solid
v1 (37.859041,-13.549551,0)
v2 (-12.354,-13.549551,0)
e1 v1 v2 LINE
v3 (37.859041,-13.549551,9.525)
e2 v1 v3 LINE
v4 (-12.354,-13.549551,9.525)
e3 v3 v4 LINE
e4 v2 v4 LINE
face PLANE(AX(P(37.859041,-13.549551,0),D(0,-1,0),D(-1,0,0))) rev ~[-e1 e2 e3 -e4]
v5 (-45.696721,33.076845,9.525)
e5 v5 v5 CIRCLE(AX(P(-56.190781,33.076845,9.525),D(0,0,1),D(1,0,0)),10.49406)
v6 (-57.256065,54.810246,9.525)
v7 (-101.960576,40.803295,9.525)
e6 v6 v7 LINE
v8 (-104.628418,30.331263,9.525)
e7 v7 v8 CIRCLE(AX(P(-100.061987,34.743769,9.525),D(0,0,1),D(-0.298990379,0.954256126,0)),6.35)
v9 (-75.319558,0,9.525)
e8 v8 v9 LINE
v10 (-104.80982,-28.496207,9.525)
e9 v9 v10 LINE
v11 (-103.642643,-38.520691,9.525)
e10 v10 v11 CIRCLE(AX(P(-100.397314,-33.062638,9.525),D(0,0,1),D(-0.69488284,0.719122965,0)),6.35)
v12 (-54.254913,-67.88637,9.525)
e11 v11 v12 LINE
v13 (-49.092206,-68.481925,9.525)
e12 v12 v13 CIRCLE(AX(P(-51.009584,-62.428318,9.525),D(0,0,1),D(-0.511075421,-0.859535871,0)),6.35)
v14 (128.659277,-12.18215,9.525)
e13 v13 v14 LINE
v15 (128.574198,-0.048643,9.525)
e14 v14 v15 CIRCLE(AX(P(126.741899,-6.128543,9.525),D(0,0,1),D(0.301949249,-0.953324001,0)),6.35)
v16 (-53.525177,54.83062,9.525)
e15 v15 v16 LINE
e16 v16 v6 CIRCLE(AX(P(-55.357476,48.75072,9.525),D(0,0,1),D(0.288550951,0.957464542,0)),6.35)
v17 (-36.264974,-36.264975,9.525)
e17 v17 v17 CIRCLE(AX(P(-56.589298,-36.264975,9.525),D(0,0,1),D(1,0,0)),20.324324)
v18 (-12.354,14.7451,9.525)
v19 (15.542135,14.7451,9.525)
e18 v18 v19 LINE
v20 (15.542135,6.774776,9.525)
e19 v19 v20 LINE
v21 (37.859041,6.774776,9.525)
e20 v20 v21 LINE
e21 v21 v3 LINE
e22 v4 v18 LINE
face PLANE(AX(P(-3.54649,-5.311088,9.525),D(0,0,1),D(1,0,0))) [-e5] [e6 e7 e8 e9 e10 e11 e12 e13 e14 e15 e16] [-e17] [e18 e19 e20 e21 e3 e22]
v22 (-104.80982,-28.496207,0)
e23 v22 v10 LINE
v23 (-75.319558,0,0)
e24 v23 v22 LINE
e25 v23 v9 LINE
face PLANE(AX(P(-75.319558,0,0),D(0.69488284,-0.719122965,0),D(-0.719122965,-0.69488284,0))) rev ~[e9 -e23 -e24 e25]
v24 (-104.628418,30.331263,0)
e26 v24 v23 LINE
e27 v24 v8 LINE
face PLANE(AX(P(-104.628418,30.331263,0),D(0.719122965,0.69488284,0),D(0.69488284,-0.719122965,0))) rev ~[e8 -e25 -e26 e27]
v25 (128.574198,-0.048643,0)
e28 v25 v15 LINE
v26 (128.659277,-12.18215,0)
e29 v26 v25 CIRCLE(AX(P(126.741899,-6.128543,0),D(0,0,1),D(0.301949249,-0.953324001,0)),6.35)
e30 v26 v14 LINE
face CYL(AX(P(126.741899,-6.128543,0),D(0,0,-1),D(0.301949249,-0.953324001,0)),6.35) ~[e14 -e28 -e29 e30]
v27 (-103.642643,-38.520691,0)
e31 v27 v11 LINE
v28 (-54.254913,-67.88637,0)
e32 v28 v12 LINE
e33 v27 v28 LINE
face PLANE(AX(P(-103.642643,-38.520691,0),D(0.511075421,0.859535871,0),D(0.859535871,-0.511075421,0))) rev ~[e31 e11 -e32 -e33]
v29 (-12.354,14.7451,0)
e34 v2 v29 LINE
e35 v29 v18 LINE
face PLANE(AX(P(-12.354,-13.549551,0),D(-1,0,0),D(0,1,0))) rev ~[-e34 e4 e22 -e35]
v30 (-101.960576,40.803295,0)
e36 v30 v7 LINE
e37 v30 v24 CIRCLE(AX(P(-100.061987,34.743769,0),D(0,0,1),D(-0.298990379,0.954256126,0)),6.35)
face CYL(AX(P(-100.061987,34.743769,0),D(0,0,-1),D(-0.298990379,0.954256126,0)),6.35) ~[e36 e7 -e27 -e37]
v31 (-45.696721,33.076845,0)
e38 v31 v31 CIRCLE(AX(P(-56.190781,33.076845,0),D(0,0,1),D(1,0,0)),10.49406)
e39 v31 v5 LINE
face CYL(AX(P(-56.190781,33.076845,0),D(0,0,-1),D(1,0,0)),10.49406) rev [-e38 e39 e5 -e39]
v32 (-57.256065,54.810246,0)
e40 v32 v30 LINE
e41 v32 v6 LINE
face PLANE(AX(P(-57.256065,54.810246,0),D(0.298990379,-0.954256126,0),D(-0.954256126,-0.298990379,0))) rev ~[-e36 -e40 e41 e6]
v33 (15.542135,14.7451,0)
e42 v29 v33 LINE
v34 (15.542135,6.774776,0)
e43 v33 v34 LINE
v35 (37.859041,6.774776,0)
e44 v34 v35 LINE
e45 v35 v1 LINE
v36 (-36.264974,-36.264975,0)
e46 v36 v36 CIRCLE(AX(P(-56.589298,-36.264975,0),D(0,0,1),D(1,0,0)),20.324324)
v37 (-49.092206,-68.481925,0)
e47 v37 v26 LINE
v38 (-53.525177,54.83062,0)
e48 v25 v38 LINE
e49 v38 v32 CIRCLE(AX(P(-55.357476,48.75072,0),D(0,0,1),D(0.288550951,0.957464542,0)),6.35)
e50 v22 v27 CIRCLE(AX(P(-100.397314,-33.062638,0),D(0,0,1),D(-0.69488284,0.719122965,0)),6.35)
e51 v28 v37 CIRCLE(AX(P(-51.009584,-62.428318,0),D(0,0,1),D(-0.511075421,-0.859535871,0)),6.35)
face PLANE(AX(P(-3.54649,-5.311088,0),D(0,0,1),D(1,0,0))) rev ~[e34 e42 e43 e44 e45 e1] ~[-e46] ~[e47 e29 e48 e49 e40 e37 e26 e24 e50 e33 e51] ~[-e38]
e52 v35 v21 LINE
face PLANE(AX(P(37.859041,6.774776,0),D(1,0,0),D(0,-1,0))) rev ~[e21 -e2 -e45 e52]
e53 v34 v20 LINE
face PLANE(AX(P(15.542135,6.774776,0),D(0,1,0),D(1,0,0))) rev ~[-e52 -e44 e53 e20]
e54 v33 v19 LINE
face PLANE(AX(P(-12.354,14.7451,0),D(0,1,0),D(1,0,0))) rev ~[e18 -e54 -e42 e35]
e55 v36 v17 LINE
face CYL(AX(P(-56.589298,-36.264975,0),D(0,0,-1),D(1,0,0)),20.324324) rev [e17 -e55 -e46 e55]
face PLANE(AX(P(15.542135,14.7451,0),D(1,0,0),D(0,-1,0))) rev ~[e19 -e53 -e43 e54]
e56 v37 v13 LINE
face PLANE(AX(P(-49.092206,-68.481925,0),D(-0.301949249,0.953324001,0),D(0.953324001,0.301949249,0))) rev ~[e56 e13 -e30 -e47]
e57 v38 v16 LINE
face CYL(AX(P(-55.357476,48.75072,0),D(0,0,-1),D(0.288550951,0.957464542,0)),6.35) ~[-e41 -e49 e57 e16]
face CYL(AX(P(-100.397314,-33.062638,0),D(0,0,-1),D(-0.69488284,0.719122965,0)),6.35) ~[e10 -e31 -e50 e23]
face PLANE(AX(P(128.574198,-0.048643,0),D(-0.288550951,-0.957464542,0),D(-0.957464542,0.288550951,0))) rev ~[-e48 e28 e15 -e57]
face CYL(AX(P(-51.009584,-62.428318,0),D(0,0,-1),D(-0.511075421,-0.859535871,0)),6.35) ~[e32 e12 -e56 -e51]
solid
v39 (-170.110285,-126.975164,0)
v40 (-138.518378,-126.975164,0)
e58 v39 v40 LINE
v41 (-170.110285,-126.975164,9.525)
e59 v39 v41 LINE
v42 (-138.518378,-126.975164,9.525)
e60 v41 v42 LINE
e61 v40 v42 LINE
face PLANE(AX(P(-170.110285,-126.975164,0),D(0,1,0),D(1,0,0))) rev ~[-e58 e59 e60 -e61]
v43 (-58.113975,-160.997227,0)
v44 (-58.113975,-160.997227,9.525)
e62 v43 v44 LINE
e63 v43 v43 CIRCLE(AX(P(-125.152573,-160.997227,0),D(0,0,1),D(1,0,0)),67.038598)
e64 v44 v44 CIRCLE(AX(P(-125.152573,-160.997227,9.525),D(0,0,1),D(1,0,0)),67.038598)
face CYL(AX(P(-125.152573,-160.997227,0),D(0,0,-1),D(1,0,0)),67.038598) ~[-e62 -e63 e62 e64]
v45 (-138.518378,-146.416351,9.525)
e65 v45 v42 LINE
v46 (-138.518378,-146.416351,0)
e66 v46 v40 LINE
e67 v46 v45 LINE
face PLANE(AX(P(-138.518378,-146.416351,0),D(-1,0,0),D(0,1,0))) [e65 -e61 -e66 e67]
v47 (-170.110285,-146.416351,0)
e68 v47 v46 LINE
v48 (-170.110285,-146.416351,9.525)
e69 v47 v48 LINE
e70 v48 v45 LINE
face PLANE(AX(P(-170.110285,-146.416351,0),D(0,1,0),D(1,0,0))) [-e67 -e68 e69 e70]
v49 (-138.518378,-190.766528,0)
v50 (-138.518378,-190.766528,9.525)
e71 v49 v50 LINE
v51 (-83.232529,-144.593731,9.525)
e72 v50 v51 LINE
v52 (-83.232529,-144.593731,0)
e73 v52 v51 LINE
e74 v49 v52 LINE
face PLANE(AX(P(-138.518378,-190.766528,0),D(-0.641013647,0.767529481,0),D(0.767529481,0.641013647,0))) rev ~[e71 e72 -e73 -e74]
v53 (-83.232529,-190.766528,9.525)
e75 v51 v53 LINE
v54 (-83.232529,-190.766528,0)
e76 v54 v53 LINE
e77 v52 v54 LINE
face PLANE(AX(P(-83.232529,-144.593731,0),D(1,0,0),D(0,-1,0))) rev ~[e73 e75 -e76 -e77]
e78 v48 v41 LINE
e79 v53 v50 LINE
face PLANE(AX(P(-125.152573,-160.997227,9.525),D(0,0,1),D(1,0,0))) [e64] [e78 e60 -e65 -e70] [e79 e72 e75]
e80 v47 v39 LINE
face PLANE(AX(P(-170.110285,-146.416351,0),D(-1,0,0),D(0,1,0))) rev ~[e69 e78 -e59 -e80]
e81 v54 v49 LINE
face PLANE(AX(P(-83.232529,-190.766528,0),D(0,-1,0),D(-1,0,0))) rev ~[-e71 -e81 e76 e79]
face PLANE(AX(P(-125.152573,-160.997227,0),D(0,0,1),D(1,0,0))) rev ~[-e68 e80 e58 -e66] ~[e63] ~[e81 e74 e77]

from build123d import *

# Parameters (mm, degrees)
F0_R     = 20.324324422
F0_R_2   = 10.4940599903
F1_DEPTH = 9.525
F2_R     = 67.0385979525
F2_W     = 31.5919071436
F2_H     = 19.4411873817
F3_DEPTH = 9.525


# Not quite as in the source:
# - a length typed as a fraction of an inch, garbled in the dataset ("3 / 203.2 mm" for 3/8 in), is restored


with BuildPart() as f1:
    # F0 (on Top) → F1 (new body)
    with BuildSketch(Plane.XY):
        with BuildLine():
            Line((128.5741976681, -0.0486427593), (-53.5251772372, 54.8306196901))
            ThreePointArc((-53.5251772372, 54.8306196901), (-55.3921510201, 55.100625175), (-57.2560646842, 54.8102462485))
            Line((-57.2560646842, 54.8102462485), (-101.960576079, 40.803295241))
            ThreePointArc((-101.960576079, 40.803295241), (-106.2154403374, 36.3114148976), (-104.6284180017, 30.3312628107))
            Line((-104.6284180017, 30.3312628107), (-75.319558382, 0))
            Line((-75.319558382, 0), (-104.8098202684, -28.4962070709))
            ThreePointArc((-104.8098202684, -28.4962070709), (-106.7047048987, -33.7970240568), (-103.6426431598, -38.5206906821))
            Line((-103.6426431598, -38.5206906821), (-54.2549128038, -67.8863703831))
            ThreePointArc((-54.2549128038, -67.8863703831), (-51.7372753813, -68.7364841392), (-49.0922061501, -68.4819250078))
            Line((-49.0922061501, -68.4819250078), (128.659276857, -12.1821500059))
            ThreePointArc((128.659276857, -12.1821500059), (133.0917430276, -6.0840179977), (128.5741976681, -0.0486427593))
        make_face()
        with Locations((-56.5892979503, -36.2649746239)):
            Circle(F0_R, mode=Mode.SUBTRACT)
        Polygon((-12.3540004715, -13.5495513678), (-12.3540004715, 14.7451004013), (15.5421346426, 14.7451004013), (15.5421346426, 6.7747756839), (37.8590412438, 6.7747756839), (37.8590412438, -13.5495513678), align=None, mode=Mode.SUBTRACT)
        with Locations((-56.1907812953, 33.0768451095)):
            Circle(F0_R_2, mode=Mode.SUBTRACT)
    extrude(amount=F1_DEPTH)


with BuildPart() as f3:
    # F2 (on Top) → F3 (new body)
    with BuildSketch(Plane.XY):
        with Locations((-125.1525729895, -160.9972268343)):
            Circle(F2_R)
        Polygon((-138.5183781385, -190.7665282488), (-83.2325294614, -144.5937305689), (-83.2325294614, -190.7665282488), align=None, mode=Mode.SUBTRACT)
        with Locations((-154.3143317103, -136.6957575083)):
            Rectangle(F2_W, F2_H, mode=Mode.SUBTRACT)
    extrude(amount=F3_DEPTH)


solid = Compound([f1.part, f3.part])
